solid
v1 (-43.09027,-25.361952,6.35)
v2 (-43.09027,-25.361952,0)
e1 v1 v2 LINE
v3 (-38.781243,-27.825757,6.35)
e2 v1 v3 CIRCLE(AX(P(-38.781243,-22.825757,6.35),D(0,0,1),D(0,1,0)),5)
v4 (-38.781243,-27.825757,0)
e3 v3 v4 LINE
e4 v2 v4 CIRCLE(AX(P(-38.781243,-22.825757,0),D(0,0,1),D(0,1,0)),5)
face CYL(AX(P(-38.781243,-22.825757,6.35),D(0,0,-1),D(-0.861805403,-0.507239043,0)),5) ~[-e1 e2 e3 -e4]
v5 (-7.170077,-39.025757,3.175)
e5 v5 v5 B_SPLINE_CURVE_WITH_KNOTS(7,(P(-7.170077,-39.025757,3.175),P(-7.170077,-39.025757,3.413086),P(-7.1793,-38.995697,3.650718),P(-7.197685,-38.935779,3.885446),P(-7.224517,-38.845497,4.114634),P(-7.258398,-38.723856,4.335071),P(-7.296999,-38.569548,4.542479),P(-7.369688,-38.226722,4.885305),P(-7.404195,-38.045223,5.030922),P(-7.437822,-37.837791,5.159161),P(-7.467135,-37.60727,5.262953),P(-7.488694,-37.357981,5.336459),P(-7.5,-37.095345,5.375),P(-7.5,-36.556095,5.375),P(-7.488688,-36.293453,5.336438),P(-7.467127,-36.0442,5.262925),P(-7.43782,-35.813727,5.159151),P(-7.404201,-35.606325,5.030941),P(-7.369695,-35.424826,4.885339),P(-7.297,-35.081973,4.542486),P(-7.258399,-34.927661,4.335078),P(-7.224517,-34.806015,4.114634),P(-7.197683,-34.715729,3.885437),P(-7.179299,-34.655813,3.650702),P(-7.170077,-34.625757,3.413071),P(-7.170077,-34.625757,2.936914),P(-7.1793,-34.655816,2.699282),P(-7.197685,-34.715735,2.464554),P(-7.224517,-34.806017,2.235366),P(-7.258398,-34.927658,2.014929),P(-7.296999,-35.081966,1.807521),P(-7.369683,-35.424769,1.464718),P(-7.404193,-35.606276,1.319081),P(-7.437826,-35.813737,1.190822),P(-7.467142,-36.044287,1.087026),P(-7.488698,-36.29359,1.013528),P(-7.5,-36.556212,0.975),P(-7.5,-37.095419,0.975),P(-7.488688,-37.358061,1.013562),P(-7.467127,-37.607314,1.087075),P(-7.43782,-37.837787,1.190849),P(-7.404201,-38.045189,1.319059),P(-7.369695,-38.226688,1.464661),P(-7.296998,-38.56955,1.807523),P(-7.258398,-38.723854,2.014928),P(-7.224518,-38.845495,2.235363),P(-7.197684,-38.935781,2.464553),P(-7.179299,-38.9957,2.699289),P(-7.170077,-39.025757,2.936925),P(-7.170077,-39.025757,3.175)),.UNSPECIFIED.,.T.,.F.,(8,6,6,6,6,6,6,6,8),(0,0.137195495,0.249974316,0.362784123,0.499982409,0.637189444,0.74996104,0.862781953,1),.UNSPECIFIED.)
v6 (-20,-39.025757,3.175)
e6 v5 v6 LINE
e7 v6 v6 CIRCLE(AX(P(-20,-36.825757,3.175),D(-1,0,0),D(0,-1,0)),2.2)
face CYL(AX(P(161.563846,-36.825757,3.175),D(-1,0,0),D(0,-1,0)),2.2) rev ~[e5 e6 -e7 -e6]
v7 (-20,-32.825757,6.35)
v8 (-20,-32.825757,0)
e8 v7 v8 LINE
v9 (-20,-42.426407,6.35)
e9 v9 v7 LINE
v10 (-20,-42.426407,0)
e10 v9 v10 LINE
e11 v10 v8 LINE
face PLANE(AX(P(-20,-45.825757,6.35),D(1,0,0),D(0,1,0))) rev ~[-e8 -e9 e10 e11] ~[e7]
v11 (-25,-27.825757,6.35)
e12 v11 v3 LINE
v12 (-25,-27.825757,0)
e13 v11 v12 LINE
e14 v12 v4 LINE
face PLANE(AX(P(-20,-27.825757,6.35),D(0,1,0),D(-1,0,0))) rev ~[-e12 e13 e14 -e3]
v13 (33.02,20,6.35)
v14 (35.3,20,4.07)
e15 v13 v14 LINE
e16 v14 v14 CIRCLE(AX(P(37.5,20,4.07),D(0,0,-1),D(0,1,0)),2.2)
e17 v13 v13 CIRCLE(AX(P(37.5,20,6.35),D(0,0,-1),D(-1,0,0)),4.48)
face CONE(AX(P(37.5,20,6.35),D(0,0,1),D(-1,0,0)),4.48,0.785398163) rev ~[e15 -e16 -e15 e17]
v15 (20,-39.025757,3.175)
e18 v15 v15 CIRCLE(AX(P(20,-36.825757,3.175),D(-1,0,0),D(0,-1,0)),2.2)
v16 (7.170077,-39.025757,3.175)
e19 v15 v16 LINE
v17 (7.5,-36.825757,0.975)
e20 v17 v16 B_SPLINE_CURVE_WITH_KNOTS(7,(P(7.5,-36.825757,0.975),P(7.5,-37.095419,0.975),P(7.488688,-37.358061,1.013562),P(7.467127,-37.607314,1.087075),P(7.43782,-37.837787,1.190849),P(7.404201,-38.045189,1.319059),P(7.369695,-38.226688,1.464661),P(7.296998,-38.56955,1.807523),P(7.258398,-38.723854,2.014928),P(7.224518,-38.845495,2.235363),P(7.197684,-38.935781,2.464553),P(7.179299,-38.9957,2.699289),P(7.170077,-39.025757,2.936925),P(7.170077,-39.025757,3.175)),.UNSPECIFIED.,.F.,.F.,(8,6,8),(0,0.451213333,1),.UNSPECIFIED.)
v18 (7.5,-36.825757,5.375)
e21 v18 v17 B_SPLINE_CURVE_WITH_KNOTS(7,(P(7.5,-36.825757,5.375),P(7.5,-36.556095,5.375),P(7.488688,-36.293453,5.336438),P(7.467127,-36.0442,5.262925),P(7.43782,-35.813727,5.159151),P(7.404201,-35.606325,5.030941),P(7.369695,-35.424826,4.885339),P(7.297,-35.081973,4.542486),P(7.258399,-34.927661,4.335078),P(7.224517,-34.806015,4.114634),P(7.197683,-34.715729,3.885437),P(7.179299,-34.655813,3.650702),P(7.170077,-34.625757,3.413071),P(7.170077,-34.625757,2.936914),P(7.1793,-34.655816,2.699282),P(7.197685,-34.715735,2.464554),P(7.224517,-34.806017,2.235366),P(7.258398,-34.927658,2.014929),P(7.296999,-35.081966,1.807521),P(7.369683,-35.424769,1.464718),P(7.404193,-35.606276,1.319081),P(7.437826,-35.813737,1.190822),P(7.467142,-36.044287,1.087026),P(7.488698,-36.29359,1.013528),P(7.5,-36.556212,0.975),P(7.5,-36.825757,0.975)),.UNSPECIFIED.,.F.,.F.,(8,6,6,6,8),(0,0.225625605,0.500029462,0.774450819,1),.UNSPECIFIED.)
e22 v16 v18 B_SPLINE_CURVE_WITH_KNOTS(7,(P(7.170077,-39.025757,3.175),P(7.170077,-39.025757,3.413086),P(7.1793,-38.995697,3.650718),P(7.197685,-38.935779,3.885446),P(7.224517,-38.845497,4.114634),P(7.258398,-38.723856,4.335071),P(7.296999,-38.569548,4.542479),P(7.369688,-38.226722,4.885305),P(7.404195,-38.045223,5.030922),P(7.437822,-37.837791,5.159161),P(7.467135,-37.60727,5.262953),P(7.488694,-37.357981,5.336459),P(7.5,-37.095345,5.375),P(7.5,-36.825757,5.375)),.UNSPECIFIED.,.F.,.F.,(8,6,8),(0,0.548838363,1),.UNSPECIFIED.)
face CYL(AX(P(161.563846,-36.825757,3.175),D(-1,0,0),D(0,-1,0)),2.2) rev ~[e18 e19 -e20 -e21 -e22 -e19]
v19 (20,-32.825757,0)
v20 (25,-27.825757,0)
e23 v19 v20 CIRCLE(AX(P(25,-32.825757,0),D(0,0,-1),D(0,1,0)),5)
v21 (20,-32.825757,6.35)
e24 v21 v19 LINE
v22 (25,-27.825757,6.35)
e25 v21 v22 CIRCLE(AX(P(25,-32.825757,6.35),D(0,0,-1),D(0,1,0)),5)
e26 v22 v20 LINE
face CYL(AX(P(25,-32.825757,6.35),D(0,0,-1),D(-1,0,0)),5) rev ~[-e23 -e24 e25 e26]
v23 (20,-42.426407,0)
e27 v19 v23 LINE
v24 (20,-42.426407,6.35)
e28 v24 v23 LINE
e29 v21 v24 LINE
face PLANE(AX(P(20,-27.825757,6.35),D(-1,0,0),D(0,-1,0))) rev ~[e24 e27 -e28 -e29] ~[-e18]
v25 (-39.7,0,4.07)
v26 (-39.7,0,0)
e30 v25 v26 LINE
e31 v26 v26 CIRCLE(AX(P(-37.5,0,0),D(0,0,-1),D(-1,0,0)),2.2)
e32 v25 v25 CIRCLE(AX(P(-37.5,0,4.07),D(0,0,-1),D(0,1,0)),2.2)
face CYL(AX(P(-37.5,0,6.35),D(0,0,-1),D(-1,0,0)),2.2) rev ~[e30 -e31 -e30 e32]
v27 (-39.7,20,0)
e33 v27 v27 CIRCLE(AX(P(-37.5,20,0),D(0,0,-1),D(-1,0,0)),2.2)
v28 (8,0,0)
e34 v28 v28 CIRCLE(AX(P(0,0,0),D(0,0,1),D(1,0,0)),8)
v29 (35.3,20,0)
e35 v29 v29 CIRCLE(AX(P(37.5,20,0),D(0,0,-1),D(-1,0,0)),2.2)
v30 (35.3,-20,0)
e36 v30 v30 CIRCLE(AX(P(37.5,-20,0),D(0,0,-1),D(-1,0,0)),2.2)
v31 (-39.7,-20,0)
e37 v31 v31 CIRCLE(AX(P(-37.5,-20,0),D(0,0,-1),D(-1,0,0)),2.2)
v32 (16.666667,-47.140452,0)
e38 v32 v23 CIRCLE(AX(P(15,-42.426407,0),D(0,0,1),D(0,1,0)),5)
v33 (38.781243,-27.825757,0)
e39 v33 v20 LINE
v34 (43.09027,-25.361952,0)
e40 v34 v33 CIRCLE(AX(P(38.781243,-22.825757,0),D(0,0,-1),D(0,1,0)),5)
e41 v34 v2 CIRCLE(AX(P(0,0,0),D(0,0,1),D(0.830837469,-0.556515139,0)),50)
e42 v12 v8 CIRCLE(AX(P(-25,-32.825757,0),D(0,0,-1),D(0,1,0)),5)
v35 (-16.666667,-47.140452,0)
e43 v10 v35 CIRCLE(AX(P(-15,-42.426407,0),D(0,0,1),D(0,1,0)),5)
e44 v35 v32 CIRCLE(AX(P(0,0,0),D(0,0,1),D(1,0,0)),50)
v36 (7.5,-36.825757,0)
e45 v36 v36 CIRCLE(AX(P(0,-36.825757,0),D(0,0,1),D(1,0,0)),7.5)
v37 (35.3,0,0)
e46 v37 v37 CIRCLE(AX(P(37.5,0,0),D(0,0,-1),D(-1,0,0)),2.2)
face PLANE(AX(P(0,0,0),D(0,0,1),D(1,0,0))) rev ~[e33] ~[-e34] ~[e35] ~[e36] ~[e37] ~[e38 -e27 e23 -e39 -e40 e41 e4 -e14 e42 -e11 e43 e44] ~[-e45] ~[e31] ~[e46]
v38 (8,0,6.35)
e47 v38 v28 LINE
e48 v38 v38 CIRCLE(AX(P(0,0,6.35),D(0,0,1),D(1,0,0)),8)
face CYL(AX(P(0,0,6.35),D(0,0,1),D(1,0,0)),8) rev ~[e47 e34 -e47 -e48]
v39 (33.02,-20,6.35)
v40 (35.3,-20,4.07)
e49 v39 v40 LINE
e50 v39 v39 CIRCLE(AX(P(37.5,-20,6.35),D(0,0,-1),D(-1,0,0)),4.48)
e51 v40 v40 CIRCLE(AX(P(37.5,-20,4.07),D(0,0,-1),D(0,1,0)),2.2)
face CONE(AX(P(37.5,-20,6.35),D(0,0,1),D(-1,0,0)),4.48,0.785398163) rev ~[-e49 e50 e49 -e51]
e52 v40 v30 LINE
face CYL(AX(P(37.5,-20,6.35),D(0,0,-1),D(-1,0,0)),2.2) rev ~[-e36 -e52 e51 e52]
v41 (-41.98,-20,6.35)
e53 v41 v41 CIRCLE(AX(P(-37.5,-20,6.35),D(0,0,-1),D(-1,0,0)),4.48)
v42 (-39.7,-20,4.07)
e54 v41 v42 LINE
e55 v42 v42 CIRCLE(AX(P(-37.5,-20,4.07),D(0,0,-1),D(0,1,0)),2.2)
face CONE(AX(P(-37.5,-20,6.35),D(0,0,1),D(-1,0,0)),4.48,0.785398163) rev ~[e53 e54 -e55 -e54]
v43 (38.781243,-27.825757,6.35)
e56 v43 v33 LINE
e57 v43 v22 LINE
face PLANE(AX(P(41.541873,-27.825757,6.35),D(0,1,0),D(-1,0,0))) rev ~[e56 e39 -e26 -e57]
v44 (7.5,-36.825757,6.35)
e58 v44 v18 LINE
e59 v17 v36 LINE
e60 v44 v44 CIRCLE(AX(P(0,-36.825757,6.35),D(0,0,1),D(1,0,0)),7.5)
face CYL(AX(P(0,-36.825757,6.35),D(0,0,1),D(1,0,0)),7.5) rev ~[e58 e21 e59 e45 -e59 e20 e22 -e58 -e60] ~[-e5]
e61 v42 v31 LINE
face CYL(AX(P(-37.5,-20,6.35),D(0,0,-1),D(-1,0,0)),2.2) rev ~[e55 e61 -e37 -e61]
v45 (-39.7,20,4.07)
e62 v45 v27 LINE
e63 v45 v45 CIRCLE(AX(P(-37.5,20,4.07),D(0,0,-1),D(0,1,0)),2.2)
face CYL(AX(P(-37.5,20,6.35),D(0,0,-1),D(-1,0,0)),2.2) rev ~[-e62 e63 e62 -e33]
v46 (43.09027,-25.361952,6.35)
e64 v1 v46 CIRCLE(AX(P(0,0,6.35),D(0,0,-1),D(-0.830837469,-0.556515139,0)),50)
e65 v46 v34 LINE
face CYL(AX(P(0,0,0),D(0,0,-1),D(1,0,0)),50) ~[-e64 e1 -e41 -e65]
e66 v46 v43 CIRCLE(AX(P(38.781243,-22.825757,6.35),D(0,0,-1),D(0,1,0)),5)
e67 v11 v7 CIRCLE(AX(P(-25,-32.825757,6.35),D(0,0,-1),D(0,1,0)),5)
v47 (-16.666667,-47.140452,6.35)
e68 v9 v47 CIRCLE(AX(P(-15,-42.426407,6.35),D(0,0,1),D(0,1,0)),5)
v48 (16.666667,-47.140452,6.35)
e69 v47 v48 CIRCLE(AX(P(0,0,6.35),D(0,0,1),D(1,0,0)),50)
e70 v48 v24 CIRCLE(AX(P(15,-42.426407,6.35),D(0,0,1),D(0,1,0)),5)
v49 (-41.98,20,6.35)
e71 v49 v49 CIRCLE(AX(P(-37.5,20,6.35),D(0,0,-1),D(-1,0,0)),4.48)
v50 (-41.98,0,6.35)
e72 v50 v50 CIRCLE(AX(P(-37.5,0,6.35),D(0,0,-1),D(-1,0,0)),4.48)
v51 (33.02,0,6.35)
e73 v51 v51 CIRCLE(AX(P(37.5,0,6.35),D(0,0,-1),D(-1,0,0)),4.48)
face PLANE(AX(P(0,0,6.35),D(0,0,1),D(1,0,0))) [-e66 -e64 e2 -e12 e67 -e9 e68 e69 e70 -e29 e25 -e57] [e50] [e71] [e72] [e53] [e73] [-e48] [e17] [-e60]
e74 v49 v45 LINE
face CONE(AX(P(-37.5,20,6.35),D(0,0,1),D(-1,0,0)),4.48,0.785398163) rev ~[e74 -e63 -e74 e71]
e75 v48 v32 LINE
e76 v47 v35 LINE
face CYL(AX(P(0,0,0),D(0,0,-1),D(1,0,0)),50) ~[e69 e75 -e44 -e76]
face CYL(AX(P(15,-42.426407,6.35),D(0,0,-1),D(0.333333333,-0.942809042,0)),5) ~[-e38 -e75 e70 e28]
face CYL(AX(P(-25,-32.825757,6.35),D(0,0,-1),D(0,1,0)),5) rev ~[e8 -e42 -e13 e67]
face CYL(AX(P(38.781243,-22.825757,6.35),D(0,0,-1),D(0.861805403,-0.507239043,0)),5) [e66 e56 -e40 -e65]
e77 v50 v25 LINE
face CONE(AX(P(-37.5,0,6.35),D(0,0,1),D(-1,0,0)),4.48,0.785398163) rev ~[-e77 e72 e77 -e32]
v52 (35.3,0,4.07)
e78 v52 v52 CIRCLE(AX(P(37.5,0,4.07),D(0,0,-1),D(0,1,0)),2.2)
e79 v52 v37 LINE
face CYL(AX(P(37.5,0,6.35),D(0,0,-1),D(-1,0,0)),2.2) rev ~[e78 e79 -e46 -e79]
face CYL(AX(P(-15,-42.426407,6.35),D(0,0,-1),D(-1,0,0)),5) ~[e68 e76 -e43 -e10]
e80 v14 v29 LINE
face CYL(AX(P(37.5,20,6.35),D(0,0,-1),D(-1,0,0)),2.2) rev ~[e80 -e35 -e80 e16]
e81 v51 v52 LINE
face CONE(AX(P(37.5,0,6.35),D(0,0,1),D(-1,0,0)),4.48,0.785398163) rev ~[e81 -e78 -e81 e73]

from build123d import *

# Parameters (mm, degrees)
F0_R           = 50
F1_DEPTH       = 6.35
F3_D           = 4.4
F3_CSINK_D     = 8.96
F3_CSINK_ANGLE = 90
F4_R           = 8
F5_DEPTH       = 8
F7_DEPTH       = 25
F9_R           = 5
F10_D          = 4.4
F11_R          = 7.5
F12_DEPTH      = 25


# Not quite as in the source:
# - a feature names something its author has since deleted; it is built from what else it names


with BuildPart() as f1:
    # F0 (on Top) → F1 (new body)
    with BuildSketch(Plane.XY):
        Circle(F0_R)
    extrude(amount=F1_DEPTH)

    # F3 (through all)
    with Locations(Plane.XY.offset(6.35)):
        with Locations((-37.5, 20), (-37.5, 0), (-37.5, -20), (37.5, 20), (37.5, 0), (37.5, -20)):
            CounterSinkHole(F3_D / 2, F3_CSINK_D / 2, counter_sink_angle=F3_CSINK_ANGLE)

    # F4 (on face) → F5 (cut)
    with BuildSketch(Plane.XY.offset(6.35)):
        Circle(F4_R)
    extrude(amount=-F5_DEPTH, mode=Mode.SUBTRACT)

    # F6 (on face) → F7 (cut)
    with BuildSketch(Plane.XY.offset(6.35)):
        with BuildLine():
            Line((-20, -27.8257569496), (-41.5418734554, -27.8257569496))
            ThreePointArc((-41.5418734554, -27.8257569496), (-32.0601083451, -38.3685998298), (-20, -45.8257569496))
            Line((-20, -45.8257569496), (-20, -27.8257569496))
        make_face()
        with BuildLine():
            ThreePointArc((20, -45.8257569496), (32.0601083451, -38.3685998298), (41.5418734554, -27.8257569496))
            Line((41.5418734554, -27.8257569496), (20, -27.8257569496))
            Line((20, -27.8257569496), (20, -45.8257569496))
        make_face()
    extrude(amount=-F7_DEPTH, mode=Mode.SUBTRACT)

    # F9
    f9_edges = [f1.edges().sort_by_distance(p)[0] for p in [
        (-41.541873, -27.825757, 3.175),
        (-20, -45.825757, 3.175),
        (-20, -27.825757, 3.175),
        (20, -27.825757, 3.175),
        (20, -45.825757, 3.175),
        (41.541873, -27.825757, 3.175),
    ]]
    fillet(f9_edges, radius=F9_R)

    # F10 (through all)
    with Locations(Plane.YZ.offset(20)):
        with Locations((-36.8257569496, 3.175)):
            Hole(F10_D / 2)

    # F11 (on face) → F12 (cut)
    with BuildSketch(Plane.XY.offset(6.35)):
        with Locations((0, -36.8257569496)):
            Circle(F11_R)
    extrude(amount=-F12_DEPTH, mode=Mode.SUBTRACT)


solid = f1.part
